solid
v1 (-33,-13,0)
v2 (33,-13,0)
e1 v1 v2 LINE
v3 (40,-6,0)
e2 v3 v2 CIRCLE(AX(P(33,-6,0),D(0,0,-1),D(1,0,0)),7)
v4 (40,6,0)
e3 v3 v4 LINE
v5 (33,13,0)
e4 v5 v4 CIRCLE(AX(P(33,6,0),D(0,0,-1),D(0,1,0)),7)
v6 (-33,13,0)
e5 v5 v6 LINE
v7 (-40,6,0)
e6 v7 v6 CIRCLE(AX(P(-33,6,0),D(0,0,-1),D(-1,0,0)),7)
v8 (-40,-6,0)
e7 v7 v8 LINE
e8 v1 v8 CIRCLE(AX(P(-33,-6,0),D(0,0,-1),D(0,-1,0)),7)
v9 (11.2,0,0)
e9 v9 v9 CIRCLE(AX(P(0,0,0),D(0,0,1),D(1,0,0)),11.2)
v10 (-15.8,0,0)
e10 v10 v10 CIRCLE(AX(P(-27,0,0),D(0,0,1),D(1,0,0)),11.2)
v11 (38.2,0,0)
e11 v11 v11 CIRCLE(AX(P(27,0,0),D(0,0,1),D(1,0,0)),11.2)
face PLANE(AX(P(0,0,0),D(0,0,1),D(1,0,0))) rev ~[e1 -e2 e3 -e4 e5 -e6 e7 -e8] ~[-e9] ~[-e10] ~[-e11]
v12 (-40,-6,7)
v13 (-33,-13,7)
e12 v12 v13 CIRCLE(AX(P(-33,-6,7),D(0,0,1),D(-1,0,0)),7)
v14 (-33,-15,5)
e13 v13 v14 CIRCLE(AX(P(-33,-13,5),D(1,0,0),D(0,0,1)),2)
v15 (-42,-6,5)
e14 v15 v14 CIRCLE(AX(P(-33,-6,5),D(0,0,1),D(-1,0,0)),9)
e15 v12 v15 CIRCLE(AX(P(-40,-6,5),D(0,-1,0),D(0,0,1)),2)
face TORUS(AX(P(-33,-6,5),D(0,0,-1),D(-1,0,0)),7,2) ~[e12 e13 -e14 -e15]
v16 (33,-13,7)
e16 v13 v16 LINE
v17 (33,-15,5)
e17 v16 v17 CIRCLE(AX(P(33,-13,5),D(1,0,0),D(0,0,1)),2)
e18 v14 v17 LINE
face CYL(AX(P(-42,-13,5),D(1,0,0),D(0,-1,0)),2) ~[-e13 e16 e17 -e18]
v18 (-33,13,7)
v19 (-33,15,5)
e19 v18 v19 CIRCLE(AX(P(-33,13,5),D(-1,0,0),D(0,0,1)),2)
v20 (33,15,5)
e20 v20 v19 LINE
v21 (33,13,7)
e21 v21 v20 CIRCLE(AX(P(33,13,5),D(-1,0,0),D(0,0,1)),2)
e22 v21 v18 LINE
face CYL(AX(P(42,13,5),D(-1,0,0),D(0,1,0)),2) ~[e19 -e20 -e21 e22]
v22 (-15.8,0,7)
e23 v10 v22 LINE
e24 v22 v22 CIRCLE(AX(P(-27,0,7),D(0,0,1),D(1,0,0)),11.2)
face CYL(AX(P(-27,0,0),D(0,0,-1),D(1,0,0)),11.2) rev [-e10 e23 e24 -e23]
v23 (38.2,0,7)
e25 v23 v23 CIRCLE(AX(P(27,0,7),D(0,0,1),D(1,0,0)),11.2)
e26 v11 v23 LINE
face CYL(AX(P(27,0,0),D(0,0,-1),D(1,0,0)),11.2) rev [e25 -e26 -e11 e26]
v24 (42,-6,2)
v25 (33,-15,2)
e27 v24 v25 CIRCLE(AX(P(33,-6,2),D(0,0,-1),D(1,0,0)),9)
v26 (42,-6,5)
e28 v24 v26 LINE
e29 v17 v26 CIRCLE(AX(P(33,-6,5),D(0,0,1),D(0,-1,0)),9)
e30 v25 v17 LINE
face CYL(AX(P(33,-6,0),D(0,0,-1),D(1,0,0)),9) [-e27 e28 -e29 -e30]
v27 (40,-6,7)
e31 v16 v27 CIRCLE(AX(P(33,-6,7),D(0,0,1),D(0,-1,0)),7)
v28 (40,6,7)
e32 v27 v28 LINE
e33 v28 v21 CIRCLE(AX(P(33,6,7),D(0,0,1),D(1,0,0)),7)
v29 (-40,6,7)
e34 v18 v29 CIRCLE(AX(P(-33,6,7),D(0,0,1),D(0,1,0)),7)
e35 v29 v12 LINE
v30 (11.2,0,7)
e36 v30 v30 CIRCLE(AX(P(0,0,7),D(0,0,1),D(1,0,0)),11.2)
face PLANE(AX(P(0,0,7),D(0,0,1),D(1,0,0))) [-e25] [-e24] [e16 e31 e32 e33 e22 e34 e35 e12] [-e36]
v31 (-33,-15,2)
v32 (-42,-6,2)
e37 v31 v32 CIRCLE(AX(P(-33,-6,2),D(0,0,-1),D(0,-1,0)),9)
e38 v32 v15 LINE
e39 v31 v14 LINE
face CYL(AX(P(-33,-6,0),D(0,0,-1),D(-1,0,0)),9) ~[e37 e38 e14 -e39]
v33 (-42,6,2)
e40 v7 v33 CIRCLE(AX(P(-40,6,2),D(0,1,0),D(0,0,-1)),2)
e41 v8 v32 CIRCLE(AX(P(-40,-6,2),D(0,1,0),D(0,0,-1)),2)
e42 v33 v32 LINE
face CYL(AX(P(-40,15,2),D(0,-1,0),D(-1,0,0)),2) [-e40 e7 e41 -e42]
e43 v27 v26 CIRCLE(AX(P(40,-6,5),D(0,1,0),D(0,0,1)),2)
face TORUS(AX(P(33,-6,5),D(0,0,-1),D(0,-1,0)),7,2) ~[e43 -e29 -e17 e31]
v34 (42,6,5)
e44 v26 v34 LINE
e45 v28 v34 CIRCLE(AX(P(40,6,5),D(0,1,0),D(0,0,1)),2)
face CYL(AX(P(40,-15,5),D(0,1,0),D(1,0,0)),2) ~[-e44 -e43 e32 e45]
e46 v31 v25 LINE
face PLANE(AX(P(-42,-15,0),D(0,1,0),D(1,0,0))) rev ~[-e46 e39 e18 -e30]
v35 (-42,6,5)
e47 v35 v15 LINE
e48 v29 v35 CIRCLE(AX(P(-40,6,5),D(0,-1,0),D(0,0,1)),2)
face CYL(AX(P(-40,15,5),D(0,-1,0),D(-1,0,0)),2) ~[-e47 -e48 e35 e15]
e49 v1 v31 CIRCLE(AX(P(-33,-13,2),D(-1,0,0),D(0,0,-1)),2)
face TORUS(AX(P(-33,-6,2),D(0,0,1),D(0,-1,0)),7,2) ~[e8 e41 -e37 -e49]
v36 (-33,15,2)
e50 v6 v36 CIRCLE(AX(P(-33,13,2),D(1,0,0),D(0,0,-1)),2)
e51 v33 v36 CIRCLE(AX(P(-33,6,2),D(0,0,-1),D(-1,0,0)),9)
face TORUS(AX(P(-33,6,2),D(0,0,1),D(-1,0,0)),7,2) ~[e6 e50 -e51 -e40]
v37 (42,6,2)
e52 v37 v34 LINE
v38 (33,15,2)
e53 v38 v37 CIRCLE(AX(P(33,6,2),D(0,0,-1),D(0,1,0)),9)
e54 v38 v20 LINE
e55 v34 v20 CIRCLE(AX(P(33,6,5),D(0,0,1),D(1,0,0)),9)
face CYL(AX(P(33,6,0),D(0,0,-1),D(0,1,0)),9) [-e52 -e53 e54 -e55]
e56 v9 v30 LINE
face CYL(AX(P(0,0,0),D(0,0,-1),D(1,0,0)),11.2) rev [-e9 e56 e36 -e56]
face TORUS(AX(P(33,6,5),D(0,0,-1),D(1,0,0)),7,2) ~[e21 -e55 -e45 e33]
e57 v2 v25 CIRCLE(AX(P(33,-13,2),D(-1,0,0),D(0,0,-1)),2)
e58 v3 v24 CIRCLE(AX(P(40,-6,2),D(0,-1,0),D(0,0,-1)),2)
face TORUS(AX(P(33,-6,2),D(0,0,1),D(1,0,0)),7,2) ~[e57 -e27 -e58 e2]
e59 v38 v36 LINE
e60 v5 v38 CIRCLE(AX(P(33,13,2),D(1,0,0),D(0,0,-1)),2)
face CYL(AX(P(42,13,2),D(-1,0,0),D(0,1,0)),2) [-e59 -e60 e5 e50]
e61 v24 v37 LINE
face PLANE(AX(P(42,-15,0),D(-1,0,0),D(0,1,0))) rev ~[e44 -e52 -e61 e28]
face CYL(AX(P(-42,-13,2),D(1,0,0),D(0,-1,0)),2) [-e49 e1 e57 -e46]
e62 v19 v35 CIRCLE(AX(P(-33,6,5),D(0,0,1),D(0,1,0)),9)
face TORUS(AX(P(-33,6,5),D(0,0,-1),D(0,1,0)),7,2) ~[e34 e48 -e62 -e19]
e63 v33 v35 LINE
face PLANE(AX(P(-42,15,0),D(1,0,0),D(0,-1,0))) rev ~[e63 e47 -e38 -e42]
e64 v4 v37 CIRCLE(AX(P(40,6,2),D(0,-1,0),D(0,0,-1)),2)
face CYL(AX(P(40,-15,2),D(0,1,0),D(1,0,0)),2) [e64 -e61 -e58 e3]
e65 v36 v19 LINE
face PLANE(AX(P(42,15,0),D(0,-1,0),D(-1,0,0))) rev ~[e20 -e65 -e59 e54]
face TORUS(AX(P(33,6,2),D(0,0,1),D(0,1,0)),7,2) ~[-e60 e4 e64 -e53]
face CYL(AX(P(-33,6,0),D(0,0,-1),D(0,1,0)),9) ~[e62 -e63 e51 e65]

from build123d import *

# Parameters (mm, degrees)
F0_R         = 11.2
F1_DEPTH     = 7
F2_R         = 2
F3_T1_DEPTH  = 7
F3_T4_ANGLE  = 90
F3_T6_ANGLE  = 90
F3_T8_ANGLE  = 90
F3_T10_ANGLE = 90
F3_T12_ANGLE = 90
F3_T14_ANGLE = 90
F3_T16_ANGLE = 90
F3_T18_ANGLE = 90


# Not quite as in the source:
# - a fillet or chamfer that OpenCascade refuses, or shapes differently, is made with other operations: its cross-section is extruded or revolved along the edge and cut away or added


with BuildPart() as f1:
    # F0 (on Top) → F1 (new body)
    with BuildSketch(Plane.XY):
        Polygon((42, 15), (0, 15), (-42, 15), (-42, -15), (42, -15), align=None)
        with Locations((-27, 0)):
            Circle(F0_R, mode=Mode.SUBTRACT)
        Circle(F0_R, mode=Mode.SUBTRACT)
        with Locations((27, 0)):
            Circle(F0_R, mode=Mode.SUBTRACT)
    extrude(amount=F1_DEPTH)

    # F2
    f2_edges = [f1.edges().sort_by_distance(p)[0] for p in [
        (0, 15, 7),
        (-42, 0, 7),
        (0, -15, 7),
        (42, 0, 7),
        (42, 0, 0),
        (0, 15, 0),
        (-42, 0, 0),
        (0, -15, 0),
    ]]
    fillet(f2_edges, radius=F2_R)

    # F3: fillet of radius 9 on 4 edges, made by hand

    # F3_s2 → F3_t1 (cut)
    with BuildSketch(Plane.XY):
        with BuildLine():
            ThreePointArc((-33, 15), (-39.3639610307, 12.3639610307), (-42, 6))
            Line((-42, 6), (-42, 15))
            Line((-42, 15), (-33, 15))
        make_face()
        with BuildLine():
            ThreePointArc((-42, -6), (-39.3639610307, -12.3639610307), (-33, -15))
            Line((-33, -15), (-42, -15))
            Line((-42, -15), (-42, -6))
        make_face()
        with BuildLine():
            ThreePointArc((42, -6), (39.3639610307, -12.3639610307), (33, -15))
            Line((33, -15), (42, -15))
            Line((42, -15), (42, -6))
        make_face()
        with BuildLine():
            ThreePointArc((33, 15), (39.3639610307, 12.3639610307), (42, 6))
            Line((42, 6), (42, 15))
            Line((42, 15), (33, 15))
        make_face()
    extrude(amount=F3_T1_DEPTH, mode=Mode.SUBTRACT)

    # F3_s3 → F3_t4 (revolve, cut)
    with BuildSketch(Plane.YZ.offset(33)):
        with BuildLine():
            ThreePointArc((13, 0), (14.4142135624, 0.5857864376), (15, 2))
            Line((15, 2), (15, 0))
            Line((15, 0), (13, 0))
        make_face()
    revolve(axis=Axis((33, 6, 0), (0, 0, -1)), revolution_arc=F3_T4_ANGLE, mode=Mode.SUBTRACT)

    # F3_s5 → F3_t6 (revolve, cut)
    with BuildSketch(Plane.XZ.offset(-6)):
        with BuildLine():
            ThreePointArc((40, 7), (41.4142135624, 6.4142135624), (42, 5))
            Line((42, 5), (42, 7))
            Line((42, 7), (40, 7))
        make_face()
    revolve(axis=Axis((33, 6, 7), (0, 0, 1)), revolution_arc=F3_T6_ANGLE, mode=Mode.SUBTRACT)

    # F3_s7 → F3_t8 (revolve, cut)
    with BuildSketch(Plane.XZ.offset(6)):
        with BuildLine():
            ThreePointArc((40, 0), (41.4142135624, 0.5857864376), (42, 2))
            Line((42, 2), (42, 0))
            Line((42, 0), (40, 0))
        make_face()
    revolve(axis=Axis((33, -6, 0), (0, 0, -1)), revolution_arc=F3_T8_ANGLE, mode=Mode.SUBTRACT)

    # F3_s9 → F3_t10 (revolve, cut)
    with BuildSketch(Plane.YZ.offset(33)):
        with BuildLine():
            ThreePointArc((-13, 7), (-14.4142135624, 6.4142135624), (-15, 5))
            Line((-15, 5), (-15, 7))
            Line((-15, 7), (-13, 7))
        make_face()
    revolve(axis=Axis((33, -6, 7), (0, 0, 1)), revolution_arc=F3_T10_ANGLE, mode=Mode.SUBTRACT)

    # F3_s11 → F3_t12 (revolve, cut)
    with BuildSketch(Plane.YZ.offset(-33)):
        with BuildLine():
            ThreePointArc((-13, 0), (-14.4142135624, 0.5857864376), (-15, 2))
            Line((-15, 2), (-15, 0))
            Line((-15, 0), (-13, 0))
        make_face()
    revolve(axis=Axis((-33, -6, 0), (0, 0, -1)), revolution_arc=F3_T12_ANGLE, mode=Mode.SUBTRACT)

    # F3_s13 → F3_t14 (revolve, cut)
    with BuildSketch(Plane.XZ.offset(6)):
        with BuildLine():
            ThreePointArc((-40, 7), (-41.4142135624, 6.4142135624), (-42, 5))
            Line((-42, 5), (-42, 7))
            Line((-42, 7), (-40, 7))
        make_face()
    revolve(axis=Axis((-33, -6, 7), (0, 0, 1)), revolution_arc=F3_T14_ANGLE, mode=Mode.SUBTRACT)

    # F3_s15 → F3_t16 (revolve, cut)
    with BuildSketch(Plane.XZ.offset(-6)):
        with BuildLine():
            ThreePointArc((-40, 0), (-41.4142135624, 0.5857864376), (-42, 2))
            Line((-42, 2), (-42, 0))
            Line((-42, 0), (-40, 0))
        make_face()
    revolve(axis=Axis((-33, 6, 0), (0, 0, -1)), revolution_arc=F3_T16_ANGLE, mode=Mode.SUBTRACT)

    # F3_s17 → F3_t18 (revolve, cut)
    with BuildSketch(Plane.YZ.offset(-33)):
        with BuildLine():
            ThreePointArc((13, 7), (14.4142135624, 6.4142135624), (15, 5))
            Line((15, 5), (15, 7))
            Line((15, 7), (13, 7))
        make_face()
    revolve(axis=Axis((-33, 6, 7), (0, 0, 1)), revolution_arc=F3_T18_ANGLE, mode=Mode.SUBTRACT)


solid = f1.part
